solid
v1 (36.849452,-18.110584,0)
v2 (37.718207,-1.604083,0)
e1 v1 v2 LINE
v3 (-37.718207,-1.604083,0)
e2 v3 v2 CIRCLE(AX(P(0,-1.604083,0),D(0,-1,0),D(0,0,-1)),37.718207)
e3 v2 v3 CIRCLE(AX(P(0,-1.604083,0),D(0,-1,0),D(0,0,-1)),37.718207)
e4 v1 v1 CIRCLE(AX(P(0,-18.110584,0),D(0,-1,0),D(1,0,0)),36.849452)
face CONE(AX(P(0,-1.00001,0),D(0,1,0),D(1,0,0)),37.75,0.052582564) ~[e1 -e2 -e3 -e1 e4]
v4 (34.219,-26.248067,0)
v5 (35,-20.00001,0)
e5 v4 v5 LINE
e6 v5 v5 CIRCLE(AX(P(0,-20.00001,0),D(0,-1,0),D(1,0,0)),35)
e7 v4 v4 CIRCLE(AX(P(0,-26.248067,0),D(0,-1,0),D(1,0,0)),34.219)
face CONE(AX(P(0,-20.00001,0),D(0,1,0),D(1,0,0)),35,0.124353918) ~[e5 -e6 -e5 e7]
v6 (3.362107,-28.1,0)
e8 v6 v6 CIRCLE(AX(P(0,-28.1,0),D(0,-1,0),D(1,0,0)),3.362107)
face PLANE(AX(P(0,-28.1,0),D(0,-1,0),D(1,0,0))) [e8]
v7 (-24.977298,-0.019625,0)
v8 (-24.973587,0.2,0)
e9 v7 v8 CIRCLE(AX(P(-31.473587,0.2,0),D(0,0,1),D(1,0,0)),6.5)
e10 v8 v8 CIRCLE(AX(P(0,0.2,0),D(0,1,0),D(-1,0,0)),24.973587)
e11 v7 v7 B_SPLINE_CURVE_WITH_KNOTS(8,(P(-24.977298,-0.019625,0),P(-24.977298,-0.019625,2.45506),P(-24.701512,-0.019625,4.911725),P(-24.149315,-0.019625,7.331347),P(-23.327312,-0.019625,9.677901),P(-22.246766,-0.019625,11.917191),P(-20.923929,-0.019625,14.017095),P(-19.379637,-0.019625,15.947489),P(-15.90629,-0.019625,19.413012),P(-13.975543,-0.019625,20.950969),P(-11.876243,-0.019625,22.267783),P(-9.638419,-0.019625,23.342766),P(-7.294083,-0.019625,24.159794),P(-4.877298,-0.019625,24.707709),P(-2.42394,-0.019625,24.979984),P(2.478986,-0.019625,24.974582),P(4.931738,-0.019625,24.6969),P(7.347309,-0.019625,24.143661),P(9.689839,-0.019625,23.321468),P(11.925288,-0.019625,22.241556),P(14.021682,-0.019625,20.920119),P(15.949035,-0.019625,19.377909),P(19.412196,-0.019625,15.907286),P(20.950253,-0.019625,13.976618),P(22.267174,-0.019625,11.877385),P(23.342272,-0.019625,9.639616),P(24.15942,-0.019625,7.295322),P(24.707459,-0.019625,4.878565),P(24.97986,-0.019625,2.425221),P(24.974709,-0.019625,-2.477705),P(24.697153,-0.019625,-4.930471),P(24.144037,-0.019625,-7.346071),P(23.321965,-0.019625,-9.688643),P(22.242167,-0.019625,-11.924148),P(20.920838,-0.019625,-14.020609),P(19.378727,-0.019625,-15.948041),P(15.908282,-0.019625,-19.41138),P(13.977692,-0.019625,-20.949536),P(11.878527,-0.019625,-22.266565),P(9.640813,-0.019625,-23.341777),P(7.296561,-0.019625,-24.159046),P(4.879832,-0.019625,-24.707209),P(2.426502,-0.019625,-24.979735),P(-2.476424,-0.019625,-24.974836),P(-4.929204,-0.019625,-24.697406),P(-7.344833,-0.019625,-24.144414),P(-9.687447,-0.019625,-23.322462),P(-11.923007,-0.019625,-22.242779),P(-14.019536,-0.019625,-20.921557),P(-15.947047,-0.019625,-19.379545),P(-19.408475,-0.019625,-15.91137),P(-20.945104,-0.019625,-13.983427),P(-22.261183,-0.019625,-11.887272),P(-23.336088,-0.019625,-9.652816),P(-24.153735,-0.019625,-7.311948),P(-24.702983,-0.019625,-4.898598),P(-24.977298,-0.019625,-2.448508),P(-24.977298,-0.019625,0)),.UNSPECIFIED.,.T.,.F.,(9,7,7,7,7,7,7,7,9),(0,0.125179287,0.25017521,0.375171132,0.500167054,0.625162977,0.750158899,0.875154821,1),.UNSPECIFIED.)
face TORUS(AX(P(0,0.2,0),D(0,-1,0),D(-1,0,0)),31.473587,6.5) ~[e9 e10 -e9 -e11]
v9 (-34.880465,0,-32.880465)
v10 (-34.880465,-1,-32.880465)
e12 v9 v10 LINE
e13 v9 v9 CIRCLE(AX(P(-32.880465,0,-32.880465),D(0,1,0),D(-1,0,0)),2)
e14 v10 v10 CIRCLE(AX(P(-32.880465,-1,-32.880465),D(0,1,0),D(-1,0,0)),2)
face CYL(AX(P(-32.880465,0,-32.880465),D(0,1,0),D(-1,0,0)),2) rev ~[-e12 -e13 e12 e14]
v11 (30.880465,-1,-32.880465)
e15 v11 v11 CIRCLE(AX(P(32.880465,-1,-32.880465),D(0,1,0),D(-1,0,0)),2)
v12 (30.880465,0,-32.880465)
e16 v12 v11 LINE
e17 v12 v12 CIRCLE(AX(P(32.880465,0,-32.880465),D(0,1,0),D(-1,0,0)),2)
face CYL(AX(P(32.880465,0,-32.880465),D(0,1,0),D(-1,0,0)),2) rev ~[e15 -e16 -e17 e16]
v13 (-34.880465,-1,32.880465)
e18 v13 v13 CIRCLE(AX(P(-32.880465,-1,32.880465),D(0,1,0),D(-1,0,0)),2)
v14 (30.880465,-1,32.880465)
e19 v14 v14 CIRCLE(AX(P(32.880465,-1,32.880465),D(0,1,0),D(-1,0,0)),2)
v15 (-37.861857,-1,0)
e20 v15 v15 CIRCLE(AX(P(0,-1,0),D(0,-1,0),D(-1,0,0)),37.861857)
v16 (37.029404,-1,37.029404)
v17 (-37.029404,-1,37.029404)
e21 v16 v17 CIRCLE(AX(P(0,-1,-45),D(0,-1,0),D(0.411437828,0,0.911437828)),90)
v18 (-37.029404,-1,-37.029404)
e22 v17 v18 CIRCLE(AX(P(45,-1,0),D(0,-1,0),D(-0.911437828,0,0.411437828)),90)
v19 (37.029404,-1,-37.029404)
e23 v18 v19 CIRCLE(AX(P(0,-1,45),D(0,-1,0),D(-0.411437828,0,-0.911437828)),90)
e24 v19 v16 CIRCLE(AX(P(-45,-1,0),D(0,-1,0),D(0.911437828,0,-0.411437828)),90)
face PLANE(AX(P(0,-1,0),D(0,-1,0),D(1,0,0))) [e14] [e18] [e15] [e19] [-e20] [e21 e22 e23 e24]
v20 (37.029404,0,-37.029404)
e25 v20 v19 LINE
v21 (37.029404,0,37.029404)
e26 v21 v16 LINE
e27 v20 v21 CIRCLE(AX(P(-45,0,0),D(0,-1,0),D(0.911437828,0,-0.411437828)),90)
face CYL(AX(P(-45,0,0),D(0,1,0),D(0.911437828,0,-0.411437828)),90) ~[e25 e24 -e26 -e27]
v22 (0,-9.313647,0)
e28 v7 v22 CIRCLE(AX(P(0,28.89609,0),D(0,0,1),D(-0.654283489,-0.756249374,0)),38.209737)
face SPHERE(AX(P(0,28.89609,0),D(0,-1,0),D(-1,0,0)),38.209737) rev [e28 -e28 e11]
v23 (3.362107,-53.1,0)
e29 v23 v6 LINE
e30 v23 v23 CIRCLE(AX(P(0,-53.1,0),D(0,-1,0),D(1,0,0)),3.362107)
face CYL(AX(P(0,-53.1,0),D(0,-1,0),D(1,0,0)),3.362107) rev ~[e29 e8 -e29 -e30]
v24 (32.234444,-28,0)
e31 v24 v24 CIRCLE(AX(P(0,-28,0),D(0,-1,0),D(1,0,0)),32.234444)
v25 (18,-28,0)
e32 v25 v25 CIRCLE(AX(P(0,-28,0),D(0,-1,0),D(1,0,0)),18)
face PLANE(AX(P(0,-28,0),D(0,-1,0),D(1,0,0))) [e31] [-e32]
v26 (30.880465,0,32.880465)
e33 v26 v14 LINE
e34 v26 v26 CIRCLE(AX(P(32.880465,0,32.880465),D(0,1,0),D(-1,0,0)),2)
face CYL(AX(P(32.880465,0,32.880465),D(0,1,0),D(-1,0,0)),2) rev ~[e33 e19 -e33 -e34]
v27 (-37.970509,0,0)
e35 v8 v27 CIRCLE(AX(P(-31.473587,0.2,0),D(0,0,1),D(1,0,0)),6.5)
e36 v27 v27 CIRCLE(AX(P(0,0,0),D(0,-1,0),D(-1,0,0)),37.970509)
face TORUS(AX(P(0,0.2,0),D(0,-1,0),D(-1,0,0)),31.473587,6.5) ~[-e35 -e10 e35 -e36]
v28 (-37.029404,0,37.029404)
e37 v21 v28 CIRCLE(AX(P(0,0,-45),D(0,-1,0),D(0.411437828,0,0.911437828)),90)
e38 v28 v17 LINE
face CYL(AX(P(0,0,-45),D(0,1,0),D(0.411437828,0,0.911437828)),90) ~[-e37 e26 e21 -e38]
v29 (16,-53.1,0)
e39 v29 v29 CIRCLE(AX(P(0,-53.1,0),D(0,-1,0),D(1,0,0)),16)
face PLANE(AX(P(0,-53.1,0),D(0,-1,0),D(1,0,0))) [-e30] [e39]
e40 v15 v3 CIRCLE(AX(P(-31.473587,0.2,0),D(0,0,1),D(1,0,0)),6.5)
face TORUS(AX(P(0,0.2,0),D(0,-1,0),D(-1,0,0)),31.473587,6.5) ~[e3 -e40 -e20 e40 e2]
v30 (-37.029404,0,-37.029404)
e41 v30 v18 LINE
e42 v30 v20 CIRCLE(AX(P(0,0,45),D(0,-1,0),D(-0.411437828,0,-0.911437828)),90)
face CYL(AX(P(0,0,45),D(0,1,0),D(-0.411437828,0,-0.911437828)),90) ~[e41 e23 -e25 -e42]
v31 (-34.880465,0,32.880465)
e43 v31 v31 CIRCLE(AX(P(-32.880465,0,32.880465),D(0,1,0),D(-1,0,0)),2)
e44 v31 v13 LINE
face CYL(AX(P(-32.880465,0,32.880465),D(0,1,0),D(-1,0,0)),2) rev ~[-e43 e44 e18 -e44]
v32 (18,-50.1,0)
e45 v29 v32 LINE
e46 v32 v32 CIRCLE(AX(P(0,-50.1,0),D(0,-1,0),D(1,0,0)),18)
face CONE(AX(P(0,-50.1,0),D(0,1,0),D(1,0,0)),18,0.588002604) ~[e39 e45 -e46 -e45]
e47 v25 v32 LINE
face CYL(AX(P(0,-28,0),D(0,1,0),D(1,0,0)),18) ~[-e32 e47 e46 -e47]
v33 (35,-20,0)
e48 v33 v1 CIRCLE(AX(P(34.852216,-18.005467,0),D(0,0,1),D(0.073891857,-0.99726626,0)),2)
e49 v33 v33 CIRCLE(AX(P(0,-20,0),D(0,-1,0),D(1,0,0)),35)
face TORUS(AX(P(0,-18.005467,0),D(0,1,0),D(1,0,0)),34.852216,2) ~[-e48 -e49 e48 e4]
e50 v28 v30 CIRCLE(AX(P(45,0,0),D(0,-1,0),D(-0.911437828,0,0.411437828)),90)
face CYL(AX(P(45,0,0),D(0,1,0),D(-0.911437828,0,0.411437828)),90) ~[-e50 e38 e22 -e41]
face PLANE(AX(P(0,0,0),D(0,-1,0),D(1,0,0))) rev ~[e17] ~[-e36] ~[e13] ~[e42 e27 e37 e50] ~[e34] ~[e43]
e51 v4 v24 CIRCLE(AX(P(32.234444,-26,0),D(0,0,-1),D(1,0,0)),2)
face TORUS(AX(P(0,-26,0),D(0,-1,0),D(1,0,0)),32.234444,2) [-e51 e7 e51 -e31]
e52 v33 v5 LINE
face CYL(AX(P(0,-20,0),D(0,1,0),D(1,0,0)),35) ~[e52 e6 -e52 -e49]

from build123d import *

# Parameters (mm, degrees)
F1_DEPTH  = 1
F2_R      = 37.75
F3_DEPTH  = 19
F4_SIZE2  = 18.99999
F4_SIZE   = 0.99999
F5_R      = 35
F6_DEPTH  = 8
F7_SIZE2  = 7.99999
F7_SIZE   = 0.99999
F9_R      = 2
F10_R     = 18
F11_DEPTH = 25.1
F12_SIZE2 = 3
F12_SIZE  = 2
F13_R     = 3.3621070756
F14_DEPTH = 25
F15_R     = 2
F16_DEPTH = 53.101
F19_R     = 6.5


# Not quite as in the source:
# - a fillet or chamfer that OpenCascade refuses, or shapes differently, is made with other operations: its cross-section is extruded or revolved along the edge and cut away or added
# - a fillet or chamfer is up to 0.001 mm smaller than in the source, because OpenCascade refuses the exact size


with BuildPart() as f1:
    # F0 (on Front) → F1 (new body)
    with BuildSketch(Plane.XZ):
        with BuildLine():
            ThreePointArc((37.029404499, -37.029404499), (45, 0), (37.029404499, 37.029404499))
            ThreePointArc((37.029404499, 37.029404499), (0, 45), (-37.029404499, 37.029404499))
            ThreePointArc((-37.029404499, 37.029404499), (-45, 0), (-37.029404499, -37.029404499))
            ThreePointArc((-37.029404499, -37.029404499), (0, -45), (37.029404499, -37.029404499))
        make_face()
    extrude(amount=F1_DEPTH)

    # F2 (on face) → F3 (join)
    with BuildSketch(Plane.XZ.offset(1)):
        Circle(F2_R)
    extrude(amount=F3_DEPTH)

    # F4 (size 1 and 19 in the source; OpenCascade refuses exactly that, so slightly less here)
    f4_edges = [f1.edges().sort_by_distance(p)[0] for p in [
        (-37.75, -20, 0),
    ]]
    f4_side = f1.faces().sort_by_distance((0, -20, 0))[0]
    chamfer(f4_edges, length=F4_SIZE, length2=F4_SIZE2, reference=f4_side)

    # F5 (on face) → F6 (join)
    with BuildSketch(Plane.XZ.offset(20)):
        Circle(F5_R)
    extrude(amount=F6_DEPTH)

    # F7 (size 1 and 8 in the source; OpenCascade refuses exactly that, so slightly less here)
    f7_edges = [f1.edges().sort_by_distance(p)[0] for p in [
        (-35, -28, 0),
    ]]
    f7_side = f1.faces().sort_by_distance((0, -28, 0))[0]
    chamfer(f7_edges, length=F7_SIZE, length2=F7_SIZE2, reference=f7_side)

    # F8: fillet of radius 2 on 1 edges, made by hand

    # F8_s1 → F8_t2 (revolve, cut)
    with BuildSketch(Plane.XY):
        with BuildLine():
            ThreePointArc((35, -20), (36.2814643906, -19.4044849409), (36.8494519972, -18.110584153))
            Line((36.8494519972, -18.110584153), (36.8893967114, -18.1126864865))
            Line((36.8893967114, -18.1126864865), (36.7899547142, -20.0021023335))
            Line((36.7899547142, -20.0021023335), (36.75001, -20.04))
            ThreePointArc((36.75001, -20.04), (35.875005, -20.04), (35.0029556743, -20.0398906504))
            Line((35.0029556743, -20.0398906504), (35, -20))
        make_face()
    revolve(axis=Axis((0, -20, 0), (0, -1, 0)), mode=Mode.SUBTRACT)

    # F9
    f9_edges = [f1.edges().sort_by_distance(p)[0] for p in [
        (-34.00001, -28, 0),
    ]]
    fillet(f9_edges, radius=F9_R)

    # F10 (on face) → F11 (join)
    with BuildSketch(Plane.XZ.offset(28)):
        Circle(F10_R)
    extrude(amount=F11_DEPTH)

    # F12
    f12_edges = [f1.edges().sort_by_distance(p)[0] for p in [
        (-18, -53.1, 0),
    ]]
    f12_side = f1.faces().sort_by_distance((0, -53.1, 0))[0]
    chamfer(f12_edges, length=F12_SIZE, length2=F12_SIZE2, reference=f12_side)

    # F13 (on face) → F14 (cut)
    with BuildSketch(Plane.XZ.offset(53.1)):
        Circle(F13_R)
    extrude(amount=-F14_DEPTH, mode=Mode.SUBTRACT)

    # F15 (on face) → F16 (cut, through all)
    with BuildSketch(Plane(origin=(0, 0, 0), x_dir=(-1, 0, 0), z_dir=(0, 1, 0))):
        with Locations((-32.8804653252, 32.8804653252)):
            Circle(F15_R)
        with Locations((-32.8804653252, -32.8804653252)):
            Circle(F15_R)
        with Locations((32.8804653252, -32.8804653252)):
            Circle(F15_R)
        with Locations((32.8804653252, 32.8804653252)):
            Circle(F15_R)
    extrude(amount=-F16_DEPTH, mode=Mode.SUBTRACT)

    # F17 (on Top) → F18 (revolve, cut)
    with BuildSketch(Plane.XY):
        with BuildLine():
            Line((0, 0), (-25, 0))
            ThreePointArc((-25, 0), (-13.3392655896, -6.9096080905), (0, -9.3136472921))
            Line((0, -9.3136472921), (0, 0))
        make_face()
    revolve(axis=Axis((0, 14.4480448216, 0), (0, 1, 0)), mode=Mode.SUBTRACT)

    # F19 (on Top) → F20 (revolve)
    with BuildSketch(Plane.XY):
        with Locations((-31.4735865454, 0.2)):
            Circle(F19_R)
    revolve(axis=Axis((0, 14.4480448216, 0), (0, 1, 0)))


solid = f1.part
